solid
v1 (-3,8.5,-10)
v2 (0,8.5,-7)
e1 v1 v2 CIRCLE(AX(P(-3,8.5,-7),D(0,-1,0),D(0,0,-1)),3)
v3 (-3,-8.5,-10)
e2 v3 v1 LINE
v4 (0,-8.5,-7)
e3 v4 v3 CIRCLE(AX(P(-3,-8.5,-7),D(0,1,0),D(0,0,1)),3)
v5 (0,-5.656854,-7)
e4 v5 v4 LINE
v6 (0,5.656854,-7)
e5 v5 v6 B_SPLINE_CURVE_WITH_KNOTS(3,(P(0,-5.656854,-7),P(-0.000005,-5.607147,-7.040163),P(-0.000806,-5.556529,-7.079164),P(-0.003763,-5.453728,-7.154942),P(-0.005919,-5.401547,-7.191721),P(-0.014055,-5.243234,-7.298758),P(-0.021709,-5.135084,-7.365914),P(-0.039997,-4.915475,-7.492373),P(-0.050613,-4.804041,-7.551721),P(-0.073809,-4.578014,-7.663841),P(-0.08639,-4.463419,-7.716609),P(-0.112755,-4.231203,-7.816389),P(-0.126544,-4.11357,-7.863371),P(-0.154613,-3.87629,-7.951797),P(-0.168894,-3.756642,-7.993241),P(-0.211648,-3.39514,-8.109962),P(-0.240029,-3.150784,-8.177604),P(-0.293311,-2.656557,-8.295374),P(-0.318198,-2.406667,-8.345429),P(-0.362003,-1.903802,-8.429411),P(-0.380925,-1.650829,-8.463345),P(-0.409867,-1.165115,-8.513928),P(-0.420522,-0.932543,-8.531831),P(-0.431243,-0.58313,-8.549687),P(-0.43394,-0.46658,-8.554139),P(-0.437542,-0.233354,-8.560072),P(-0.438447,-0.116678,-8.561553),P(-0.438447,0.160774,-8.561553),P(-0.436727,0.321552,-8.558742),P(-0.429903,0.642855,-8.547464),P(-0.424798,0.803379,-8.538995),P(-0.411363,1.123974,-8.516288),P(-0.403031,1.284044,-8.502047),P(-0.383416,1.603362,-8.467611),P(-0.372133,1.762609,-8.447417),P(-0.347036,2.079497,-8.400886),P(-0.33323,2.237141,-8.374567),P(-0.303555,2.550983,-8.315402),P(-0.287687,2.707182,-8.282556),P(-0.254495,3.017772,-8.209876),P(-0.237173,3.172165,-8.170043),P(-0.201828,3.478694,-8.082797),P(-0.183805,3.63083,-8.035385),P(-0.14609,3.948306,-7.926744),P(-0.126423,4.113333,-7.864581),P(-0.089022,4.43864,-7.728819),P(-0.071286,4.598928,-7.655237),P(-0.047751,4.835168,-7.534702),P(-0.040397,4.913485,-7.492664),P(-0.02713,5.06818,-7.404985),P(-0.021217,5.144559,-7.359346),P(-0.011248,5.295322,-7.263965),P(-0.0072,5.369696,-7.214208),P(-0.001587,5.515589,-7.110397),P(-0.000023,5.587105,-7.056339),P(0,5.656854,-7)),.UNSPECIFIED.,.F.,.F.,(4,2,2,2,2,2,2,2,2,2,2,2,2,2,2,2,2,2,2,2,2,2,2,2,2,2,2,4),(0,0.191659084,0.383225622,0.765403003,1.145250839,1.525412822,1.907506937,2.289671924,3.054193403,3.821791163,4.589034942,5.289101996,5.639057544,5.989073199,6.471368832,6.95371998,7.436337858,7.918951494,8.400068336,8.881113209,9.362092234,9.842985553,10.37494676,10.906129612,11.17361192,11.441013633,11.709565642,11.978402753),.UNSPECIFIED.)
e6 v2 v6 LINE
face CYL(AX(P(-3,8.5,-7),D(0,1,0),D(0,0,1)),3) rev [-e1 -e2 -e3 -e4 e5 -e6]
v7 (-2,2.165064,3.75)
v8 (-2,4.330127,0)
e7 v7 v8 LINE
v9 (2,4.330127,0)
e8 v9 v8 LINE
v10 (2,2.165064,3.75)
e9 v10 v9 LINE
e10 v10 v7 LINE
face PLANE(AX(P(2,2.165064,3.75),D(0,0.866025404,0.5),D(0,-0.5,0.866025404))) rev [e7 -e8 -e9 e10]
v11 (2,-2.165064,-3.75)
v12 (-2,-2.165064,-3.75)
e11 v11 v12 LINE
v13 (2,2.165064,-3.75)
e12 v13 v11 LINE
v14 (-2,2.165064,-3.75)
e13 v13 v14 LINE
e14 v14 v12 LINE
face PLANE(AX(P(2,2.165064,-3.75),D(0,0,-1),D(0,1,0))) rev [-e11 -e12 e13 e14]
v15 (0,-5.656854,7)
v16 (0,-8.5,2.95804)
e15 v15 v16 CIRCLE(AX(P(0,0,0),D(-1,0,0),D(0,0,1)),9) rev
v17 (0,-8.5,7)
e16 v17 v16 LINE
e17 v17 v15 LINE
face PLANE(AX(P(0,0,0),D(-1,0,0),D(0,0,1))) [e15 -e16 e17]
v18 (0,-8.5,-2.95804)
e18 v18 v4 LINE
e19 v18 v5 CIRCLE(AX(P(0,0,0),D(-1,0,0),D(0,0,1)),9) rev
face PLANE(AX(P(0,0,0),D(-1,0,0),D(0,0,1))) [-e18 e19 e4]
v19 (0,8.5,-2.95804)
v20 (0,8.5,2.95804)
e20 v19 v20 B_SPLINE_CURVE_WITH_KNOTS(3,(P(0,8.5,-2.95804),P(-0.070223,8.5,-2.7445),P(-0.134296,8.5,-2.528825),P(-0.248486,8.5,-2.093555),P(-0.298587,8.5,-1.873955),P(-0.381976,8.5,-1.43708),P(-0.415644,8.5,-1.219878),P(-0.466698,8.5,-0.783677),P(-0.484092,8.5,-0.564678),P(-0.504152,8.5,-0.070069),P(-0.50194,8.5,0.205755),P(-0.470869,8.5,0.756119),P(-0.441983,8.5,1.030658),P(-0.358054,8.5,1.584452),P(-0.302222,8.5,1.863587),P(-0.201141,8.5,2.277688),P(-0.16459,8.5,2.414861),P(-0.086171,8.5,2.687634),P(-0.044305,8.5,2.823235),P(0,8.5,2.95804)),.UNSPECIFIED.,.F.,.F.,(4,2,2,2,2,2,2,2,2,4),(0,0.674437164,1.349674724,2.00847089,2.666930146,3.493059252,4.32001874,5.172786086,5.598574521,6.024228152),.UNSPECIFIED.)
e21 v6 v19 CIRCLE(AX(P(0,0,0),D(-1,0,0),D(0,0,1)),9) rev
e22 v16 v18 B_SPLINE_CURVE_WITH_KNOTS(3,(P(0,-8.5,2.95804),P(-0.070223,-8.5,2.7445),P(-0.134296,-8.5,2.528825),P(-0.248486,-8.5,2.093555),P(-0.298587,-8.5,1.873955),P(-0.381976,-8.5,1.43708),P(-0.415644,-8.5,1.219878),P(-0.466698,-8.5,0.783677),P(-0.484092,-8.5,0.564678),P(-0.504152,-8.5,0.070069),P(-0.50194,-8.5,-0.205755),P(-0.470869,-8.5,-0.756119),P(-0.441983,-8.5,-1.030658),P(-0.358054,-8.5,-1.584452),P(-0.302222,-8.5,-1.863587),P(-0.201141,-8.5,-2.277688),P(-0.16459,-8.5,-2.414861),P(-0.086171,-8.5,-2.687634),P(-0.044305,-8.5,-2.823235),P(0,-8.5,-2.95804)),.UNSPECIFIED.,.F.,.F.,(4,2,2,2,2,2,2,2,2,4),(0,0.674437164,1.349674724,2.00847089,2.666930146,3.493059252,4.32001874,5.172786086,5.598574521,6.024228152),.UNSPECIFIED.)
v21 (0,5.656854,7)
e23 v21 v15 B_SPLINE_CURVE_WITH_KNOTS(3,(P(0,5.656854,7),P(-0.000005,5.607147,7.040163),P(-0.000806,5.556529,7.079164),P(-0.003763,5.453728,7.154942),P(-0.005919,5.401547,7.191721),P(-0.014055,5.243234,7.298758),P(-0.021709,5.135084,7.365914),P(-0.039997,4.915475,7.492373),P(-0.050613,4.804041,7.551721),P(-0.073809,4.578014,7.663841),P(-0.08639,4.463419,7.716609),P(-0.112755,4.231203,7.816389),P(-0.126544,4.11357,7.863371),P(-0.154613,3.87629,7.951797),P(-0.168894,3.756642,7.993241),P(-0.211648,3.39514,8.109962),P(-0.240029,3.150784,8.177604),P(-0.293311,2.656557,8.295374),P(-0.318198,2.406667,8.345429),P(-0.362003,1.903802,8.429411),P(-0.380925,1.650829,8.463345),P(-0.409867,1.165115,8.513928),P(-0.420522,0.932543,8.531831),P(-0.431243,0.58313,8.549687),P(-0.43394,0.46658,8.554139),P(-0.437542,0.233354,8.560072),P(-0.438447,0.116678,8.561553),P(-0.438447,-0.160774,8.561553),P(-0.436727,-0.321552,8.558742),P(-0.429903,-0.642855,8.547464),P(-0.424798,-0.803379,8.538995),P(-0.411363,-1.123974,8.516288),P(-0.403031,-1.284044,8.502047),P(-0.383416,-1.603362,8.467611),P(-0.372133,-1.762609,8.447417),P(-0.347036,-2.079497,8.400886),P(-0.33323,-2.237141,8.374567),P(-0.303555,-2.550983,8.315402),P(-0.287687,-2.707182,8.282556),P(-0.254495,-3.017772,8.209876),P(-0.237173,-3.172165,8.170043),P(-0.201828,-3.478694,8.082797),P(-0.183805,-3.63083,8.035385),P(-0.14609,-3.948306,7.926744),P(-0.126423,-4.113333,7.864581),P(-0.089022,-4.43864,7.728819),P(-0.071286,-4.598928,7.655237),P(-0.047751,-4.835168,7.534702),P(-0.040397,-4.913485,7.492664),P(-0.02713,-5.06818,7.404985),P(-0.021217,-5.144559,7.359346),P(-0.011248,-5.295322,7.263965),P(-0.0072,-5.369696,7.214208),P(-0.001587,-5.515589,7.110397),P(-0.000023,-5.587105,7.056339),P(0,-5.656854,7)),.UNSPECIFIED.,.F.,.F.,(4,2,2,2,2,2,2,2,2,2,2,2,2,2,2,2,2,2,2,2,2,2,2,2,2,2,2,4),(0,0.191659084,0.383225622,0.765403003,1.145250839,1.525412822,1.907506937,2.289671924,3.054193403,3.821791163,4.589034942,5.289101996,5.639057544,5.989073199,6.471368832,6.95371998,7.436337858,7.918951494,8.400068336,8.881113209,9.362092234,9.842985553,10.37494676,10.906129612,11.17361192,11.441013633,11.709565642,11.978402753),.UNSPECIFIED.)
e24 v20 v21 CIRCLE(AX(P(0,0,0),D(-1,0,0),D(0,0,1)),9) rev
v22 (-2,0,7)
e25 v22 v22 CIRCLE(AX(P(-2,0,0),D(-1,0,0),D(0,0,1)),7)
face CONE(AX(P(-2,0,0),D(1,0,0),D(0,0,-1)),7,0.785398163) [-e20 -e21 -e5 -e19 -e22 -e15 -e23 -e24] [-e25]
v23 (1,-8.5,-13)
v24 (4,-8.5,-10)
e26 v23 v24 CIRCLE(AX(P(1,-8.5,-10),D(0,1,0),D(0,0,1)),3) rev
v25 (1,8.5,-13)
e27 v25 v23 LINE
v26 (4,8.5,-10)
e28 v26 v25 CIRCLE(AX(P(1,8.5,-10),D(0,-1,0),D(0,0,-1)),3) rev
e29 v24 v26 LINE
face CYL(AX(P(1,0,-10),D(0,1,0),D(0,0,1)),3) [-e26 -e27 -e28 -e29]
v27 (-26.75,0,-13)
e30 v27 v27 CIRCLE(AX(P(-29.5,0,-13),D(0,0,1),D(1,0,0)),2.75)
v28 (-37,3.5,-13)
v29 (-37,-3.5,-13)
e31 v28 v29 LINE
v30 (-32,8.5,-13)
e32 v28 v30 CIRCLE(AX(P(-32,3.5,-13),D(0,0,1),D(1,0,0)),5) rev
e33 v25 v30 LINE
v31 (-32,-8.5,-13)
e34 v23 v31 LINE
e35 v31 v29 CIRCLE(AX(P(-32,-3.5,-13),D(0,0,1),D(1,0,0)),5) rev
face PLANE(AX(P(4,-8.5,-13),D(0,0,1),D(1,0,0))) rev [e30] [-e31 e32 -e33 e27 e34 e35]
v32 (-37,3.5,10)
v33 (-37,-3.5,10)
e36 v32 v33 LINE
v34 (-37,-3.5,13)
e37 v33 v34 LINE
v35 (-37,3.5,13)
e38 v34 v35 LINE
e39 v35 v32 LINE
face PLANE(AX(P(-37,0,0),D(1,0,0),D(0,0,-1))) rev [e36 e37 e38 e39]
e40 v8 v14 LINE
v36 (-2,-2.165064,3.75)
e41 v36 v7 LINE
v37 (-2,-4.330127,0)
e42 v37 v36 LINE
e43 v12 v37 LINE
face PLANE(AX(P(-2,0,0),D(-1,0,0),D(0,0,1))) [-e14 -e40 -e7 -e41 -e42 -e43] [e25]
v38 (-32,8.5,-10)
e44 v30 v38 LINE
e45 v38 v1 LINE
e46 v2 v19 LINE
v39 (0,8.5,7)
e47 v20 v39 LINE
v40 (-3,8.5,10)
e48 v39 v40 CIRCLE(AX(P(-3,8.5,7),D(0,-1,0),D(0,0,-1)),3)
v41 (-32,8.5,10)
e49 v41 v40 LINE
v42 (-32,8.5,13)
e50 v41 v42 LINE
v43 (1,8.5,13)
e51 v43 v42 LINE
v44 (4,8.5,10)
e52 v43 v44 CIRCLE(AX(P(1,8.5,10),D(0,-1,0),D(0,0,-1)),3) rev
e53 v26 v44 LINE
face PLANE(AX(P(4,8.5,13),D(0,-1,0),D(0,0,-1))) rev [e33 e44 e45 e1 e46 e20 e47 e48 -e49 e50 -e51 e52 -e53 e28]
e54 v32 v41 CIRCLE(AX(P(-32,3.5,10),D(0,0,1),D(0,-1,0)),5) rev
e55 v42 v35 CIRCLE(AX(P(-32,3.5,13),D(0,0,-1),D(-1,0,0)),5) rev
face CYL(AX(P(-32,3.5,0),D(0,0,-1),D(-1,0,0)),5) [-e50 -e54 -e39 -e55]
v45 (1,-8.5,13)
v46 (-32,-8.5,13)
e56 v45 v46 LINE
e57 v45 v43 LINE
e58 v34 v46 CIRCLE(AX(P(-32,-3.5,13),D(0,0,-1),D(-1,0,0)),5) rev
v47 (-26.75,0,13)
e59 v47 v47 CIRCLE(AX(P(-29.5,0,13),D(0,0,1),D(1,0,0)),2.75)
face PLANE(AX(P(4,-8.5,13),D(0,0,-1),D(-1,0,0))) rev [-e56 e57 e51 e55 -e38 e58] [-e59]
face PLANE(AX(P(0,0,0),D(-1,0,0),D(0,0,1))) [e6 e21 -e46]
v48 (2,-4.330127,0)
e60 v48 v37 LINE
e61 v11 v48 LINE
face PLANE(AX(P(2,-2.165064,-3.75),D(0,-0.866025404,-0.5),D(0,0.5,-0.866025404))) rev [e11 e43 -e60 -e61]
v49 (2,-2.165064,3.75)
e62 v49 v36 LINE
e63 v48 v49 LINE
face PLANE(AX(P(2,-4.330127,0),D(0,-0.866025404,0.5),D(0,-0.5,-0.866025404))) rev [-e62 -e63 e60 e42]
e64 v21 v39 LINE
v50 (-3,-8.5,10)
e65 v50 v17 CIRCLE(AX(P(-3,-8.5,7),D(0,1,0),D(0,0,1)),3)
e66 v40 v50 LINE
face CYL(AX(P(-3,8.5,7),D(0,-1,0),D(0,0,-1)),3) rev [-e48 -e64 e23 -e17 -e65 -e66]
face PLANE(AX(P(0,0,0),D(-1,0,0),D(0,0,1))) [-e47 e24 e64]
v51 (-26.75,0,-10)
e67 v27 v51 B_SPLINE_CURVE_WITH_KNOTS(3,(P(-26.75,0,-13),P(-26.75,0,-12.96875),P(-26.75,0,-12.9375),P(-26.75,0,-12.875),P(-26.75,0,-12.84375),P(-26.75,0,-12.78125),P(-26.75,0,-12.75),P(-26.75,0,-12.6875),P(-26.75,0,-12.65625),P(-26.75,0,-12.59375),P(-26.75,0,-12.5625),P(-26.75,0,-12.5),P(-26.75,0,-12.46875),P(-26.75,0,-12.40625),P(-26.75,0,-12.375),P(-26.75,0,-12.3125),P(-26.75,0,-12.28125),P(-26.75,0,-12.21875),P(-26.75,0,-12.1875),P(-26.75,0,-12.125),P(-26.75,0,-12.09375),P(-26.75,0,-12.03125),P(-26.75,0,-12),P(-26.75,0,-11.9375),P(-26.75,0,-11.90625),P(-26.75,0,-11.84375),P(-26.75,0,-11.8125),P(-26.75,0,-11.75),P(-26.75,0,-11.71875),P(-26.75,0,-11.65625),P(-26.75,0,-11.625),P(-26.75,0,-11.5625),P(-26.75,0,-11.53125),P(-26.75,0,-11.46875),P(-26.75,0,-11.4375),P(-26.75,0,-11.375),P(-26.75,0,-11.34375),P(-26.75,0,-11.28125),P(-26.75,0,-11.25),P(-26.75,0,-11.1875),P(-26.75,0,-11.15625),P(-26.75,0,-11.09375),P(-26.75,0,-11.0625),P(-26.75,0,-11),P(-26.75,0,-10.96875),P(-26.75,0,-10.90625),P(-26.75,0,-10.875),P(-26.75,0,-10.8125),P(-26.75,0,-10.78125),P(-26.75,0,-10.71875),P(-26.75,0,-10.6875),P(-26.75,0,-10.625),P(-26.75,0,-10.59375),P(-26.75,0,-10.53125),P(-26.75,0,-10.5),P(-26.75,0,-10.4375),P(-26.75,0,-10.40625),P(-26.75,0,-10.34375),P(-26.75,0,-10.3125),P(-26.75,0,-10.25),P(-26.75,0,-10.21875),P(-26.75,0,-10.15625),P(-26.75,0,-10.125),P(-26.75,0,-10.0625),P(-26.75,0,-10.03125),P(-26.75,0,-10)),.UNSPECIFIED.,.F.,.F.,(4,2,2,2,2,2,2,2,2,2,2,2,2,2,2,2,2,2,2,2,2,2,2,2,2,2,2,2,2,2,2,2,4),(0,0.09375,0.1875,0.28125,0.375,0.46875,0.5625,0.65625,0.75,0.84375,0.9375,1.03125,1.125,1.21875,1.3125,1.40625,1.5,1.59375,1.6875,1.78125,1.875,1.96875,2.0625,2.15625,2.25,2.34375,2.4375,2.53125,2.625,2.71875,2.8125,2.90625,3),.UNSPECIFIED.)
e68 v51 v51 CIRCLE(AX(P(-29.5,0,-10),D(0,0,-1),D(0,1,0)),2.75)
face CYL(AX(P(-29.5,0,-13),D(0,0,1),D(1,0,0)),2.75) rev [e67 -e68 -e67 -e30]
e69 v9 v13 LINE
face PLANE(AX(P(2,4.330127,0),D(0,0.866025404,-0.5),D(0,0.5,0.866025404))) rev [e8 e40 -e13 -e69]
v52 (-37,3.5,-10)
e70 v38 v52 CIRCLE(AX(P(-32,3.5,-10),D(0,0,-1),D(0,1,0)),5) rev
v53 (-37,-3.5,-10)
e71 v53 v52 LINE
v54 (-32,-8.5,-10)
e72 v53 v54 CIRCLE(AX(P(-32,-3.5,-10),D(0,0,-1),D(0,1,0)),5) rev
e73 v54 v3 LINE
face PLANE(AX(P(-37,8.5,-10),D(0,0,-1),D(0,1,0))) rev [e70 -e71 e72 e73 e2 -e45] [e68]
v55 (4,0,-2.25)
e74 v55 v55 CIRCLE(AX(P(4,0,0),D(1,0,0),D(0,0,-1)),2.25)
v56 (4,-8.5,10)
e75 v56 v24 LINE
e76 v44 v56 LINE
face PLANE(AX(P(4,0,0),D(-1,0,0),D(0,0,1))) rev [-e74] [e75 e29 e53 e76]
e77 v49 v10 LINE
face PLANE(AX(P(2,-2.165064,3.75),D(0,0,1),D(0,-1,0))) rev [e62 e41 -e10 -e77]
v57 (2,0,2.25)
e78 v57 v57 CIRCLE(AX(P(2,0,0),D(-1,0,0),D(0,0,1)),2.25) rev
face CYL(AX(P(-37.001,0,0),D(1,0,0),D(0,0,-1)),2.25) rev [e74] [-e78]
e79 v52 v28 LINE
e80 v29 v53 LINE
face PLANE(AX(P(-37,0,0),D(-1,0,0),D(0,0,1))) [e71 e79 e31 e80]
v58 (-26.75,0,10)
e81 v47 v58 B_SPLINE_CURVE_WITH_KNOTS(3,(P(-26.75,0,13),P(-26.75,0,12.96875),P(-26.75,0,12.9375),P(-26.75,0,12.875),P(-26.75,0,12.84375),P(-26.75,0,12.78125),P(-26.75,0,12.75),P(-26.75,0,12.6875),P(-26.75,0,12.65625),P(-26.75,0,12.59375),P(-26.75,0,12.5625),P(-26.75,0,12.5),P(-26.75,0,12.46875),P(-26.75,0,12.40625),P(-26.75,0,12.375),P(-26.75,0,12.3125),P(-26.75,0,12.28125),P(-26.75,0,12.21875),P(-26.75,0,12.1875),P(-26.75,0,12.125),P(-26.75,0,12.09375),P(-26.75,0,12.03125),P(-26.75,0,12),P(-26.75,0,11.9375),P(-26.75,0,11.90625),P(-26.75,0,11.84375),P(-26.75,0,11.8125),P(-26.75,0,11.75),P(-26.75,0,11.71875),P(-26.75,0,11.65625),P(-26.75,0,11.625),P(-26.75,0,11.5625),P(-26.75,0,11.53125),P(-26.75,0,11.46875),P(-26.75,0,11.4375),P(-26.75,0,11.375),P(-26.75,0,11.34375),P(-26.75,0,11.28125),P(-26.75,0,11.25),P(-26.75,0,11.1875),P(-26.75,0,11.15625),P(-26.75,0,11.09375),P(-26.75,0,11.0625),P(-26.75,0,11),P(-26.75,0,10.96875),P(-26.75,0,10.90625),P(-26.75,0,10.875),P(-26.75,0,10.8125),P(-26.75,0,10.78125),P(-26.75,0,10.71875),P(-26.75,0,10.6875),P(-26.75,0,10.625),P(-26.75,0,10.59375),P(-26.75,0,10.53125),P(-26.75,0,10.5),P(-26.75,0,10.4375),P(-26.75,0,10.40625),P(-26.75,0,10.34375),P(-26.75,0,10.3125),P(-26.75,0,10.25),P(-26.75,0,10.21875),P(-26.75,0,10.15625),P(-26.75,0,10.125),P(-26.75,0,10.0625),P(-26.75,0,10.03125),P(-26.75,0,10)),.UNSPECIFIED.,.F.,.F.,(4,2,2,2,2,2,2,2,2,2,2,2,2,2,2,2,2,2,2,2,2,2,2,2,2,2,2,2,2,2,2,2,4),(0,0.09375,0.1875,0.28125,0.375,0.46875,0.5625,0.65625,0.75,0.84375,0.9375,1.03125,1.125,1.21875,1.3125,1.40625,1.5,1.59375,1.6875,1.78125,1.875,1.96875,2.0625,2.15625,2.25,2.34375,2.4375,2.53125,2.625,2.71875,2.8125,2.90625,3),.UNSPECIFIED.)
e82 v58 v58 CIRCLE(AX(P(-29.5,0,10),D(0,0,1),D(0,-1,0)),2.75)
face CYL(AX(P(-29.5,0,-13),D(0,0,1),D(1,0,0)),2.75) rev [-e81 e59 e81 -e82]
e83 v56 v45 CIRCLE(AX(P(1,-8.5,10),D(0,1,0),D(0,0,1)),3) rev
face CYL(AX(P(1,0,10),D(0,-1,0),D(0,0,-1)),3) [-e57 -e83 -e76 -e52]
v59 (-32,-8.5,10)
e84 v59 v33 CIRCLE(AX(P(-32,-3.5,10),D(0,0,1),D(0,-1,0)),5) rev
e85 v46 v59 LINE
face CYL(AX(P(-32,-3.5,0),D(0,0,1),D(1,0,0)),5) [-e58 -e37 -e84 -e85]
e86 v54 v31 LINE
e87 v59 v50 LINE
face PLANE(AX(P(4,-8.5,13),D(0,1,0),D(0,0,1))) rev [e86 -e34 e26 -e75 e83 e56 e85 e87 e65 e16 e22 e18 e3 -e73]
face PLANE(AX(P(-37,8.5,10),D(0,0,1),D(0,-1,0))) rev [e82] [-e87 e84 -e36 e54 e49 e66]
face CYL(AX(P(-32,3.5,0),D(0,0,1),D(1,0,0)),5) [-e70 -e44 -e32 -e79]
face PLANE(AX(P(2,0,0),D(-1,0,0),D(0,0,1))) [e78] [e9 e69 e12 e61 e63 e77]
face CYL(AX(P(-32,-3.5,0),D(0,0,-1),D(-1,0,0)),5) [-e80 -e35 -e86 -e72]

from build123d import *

# Parameters (mm, degrees)
SKETCH1_W           = 26
SKETCH1_H           = 17
BOSS_EXTRUDE1_DEPTH = 4
SKETCH2_W           = 3
SKETCH2_H           = 17
BOSS_EXTRUDE2_DEPTH = 37
SKETCH3_R           = 2.75
CUT_EXTRUDE1_DEPTH  = 47.013584951
FILLET1_R           = 3
FILLET2_R           = 5
SKETCH5_R           = 7
BOSS_EXTRUDE3_DEPTH = 2
CUT_EXTRUDE3_REACH  = 45.843
SKETCH7_R           = 2.25
CUT_EXTRUDE4_DEPTH  = 4
CHAMFER1_SIZE       = 2


with BuildPart() as part:
    # Sketch1 → Boss-Extrude1 (new body)
    with BuildSketch(Plane(origin=(0, 0, 0), x_dir=(0, 0, -1), z_dir=(1, 0, 0))):
        Rectangle(SKETCH1_W, SKETCH1_H)
    extrude(amount=BOSS_EXTRUDE1_DEPTH)

    # Sketch2 → Boss-Extrude2 (add)
    with BuildSketch(Plane.ZY):
        with Locations((-11.5, 0)):
            Rectangle(SKETCH2_W, SKETCH2_H)
        with Locations((11.5, 0)):
            Rectangle(SKETCH2_W, SKETCH2_H)
    extrude(amount=BOSS_EXTRUDE2_DEPTH)

    # Sketch3 → Cut-Extrude1 (cut, through all)
    with BuildSketch(Plane.XY.offset(13)):
        with Locations((-29.5, 0)):
            Circle(SKETCH3_R)
    extrude(amount=-CUT_EXTRUDE1_DEPTH, mode=Mode.SUBTRACT)

    # Fillet1
    fillet1_edges = [part.edges().sort_by_distance(p)[0] for p in [
        (4, 0, 13),
        (0, 0, -10),
        (0, 0, 10),
        (4, 0, -13),
    ]]
    fillet(fillet1_edges, radius=FILLET1_R)

    # Fillet2
    fillet2_edges = [part.edges().sort_by_distance(p)[0] for p in [
        (-37, -8.5, -11.5),
        (-37, 8.5, -11.5),
        (-37, 8.5, 11.5),
        (-37, -8.5, 11.5),
    ]]
    fillet(fillet2_edges, radius=FILLET2_R)

    # Sketch5 → Boss-Extrude3 (add)
    with BuildSketch(Plane.ZY):
        Circle(SKETCH5_R)
    extrude(amount=BOSS_EXTRUDE3_DEPTH)

    # Sketch7 → Cut-Extrude3 (cut, up to next)
    with BuildSketch(Plane(origin=(4, 0, 0), x_dir=(0, 0, -1), z_dir=(1, 0, 0)), mode=Mode.PRIVATE) as cut_extrude3_sk1:
        Circle(SKETCH7_R)
    cut_extrude3_tool1 = extrude(cut_extrude3_sk1.sketch, amount=-CUT_EXTRUDE3_REACH, mode=Mode.PRIVATE) & part.part
    add(cut_extrude3_tool1.solids().sort_by_distance((4, 0, 0))[0], mode=Mode.SUBTRACT)

    # Sketch8 → Cut-Extrude4 (cut)
    with BuildSketch(Plane.ZY.offset(2)):
        Polygon((0, 4.330127019), (-3.75, 2.165063509), (-3.75, -2.165063509), (0, -4.330127019), (3.75, -2.165063509), (3.75, 2.165063509), align=None)
    extrude(amount=-CUT_EXTRUDE4_DEPTH, mode=Mode.SUBTRACT)

    # Chamfer1
    # the kernel refuses this chamfer: 2 mm, written as the material it adds along each edge
    with BuildSketch(Plane(origin=(0, 0, 0), x_dir=(0, 0, 1), z_dir=(0, -1, 0))) as chamfer1_piece_1_section:
        Polygon((7 + CHAMFER1_SIZE, 0), (7, CHAMFER1_SIZE), (7, 0), align=None)
    chamfer1_piece_1 = revolve(axis=Axis((0, 0, 0), (-1, 0, 0)), revolution_arc=180, mode=Mode.PRIVATE)
    chamfer1_piece_1 = split(chamfer1_piece_1, bisect_by=Plane(origin=(-0.945270908, 8.5, 0), z_dir=(0, -1, 0)), keep=Keep.TOP, mode=Mode.PRIVATE)
    chamfer1_piece_1 = split(chamfer1_piece_1, bisect_by=Plane(origin=(-2, 8.001839451, 0), z_dir=(1, 0, 0)), keep=Keep.TOP, mode=Mode.PRIVATE)
    add(chamfer1_piece_1)
    with BuildSketch(Plane(origin=(0, 0, 0), x_dir=(0, 0, -1), z_dir=(0, 1, 0))) as chamfer1_piece_2_section:
        Polygon((7 + CHAMFER1_SIZE, 0), (7, CHAMFER1_SIZE), (7, 0), align=None)
    chamfer1_piece_2 = revolve(axis=Axis((0, 0, 0), (-1, 0, 0)), revolution_arc=180, mode=Mode.PRIVATE)
    chamfer1_piece_2 = split(chamfer1_piece_2, bisect_by=Plane(origin=(-0.945270905, -8.5, 0), z_dir=(0, 1, 0)), keep=Keep.TOP, mode=Mode.PRIVATE)
    chamfer1_piece_2 = split(chamfer1_piece_2, bisect_by=Plane(origin=(-2, -8.001839447, 0), z_dir=(1, 0, 0)), keep=Keep.TOP, mode=Mode.PRIVATE)
    add(chamfer1_piece_2)


solid = part.part
